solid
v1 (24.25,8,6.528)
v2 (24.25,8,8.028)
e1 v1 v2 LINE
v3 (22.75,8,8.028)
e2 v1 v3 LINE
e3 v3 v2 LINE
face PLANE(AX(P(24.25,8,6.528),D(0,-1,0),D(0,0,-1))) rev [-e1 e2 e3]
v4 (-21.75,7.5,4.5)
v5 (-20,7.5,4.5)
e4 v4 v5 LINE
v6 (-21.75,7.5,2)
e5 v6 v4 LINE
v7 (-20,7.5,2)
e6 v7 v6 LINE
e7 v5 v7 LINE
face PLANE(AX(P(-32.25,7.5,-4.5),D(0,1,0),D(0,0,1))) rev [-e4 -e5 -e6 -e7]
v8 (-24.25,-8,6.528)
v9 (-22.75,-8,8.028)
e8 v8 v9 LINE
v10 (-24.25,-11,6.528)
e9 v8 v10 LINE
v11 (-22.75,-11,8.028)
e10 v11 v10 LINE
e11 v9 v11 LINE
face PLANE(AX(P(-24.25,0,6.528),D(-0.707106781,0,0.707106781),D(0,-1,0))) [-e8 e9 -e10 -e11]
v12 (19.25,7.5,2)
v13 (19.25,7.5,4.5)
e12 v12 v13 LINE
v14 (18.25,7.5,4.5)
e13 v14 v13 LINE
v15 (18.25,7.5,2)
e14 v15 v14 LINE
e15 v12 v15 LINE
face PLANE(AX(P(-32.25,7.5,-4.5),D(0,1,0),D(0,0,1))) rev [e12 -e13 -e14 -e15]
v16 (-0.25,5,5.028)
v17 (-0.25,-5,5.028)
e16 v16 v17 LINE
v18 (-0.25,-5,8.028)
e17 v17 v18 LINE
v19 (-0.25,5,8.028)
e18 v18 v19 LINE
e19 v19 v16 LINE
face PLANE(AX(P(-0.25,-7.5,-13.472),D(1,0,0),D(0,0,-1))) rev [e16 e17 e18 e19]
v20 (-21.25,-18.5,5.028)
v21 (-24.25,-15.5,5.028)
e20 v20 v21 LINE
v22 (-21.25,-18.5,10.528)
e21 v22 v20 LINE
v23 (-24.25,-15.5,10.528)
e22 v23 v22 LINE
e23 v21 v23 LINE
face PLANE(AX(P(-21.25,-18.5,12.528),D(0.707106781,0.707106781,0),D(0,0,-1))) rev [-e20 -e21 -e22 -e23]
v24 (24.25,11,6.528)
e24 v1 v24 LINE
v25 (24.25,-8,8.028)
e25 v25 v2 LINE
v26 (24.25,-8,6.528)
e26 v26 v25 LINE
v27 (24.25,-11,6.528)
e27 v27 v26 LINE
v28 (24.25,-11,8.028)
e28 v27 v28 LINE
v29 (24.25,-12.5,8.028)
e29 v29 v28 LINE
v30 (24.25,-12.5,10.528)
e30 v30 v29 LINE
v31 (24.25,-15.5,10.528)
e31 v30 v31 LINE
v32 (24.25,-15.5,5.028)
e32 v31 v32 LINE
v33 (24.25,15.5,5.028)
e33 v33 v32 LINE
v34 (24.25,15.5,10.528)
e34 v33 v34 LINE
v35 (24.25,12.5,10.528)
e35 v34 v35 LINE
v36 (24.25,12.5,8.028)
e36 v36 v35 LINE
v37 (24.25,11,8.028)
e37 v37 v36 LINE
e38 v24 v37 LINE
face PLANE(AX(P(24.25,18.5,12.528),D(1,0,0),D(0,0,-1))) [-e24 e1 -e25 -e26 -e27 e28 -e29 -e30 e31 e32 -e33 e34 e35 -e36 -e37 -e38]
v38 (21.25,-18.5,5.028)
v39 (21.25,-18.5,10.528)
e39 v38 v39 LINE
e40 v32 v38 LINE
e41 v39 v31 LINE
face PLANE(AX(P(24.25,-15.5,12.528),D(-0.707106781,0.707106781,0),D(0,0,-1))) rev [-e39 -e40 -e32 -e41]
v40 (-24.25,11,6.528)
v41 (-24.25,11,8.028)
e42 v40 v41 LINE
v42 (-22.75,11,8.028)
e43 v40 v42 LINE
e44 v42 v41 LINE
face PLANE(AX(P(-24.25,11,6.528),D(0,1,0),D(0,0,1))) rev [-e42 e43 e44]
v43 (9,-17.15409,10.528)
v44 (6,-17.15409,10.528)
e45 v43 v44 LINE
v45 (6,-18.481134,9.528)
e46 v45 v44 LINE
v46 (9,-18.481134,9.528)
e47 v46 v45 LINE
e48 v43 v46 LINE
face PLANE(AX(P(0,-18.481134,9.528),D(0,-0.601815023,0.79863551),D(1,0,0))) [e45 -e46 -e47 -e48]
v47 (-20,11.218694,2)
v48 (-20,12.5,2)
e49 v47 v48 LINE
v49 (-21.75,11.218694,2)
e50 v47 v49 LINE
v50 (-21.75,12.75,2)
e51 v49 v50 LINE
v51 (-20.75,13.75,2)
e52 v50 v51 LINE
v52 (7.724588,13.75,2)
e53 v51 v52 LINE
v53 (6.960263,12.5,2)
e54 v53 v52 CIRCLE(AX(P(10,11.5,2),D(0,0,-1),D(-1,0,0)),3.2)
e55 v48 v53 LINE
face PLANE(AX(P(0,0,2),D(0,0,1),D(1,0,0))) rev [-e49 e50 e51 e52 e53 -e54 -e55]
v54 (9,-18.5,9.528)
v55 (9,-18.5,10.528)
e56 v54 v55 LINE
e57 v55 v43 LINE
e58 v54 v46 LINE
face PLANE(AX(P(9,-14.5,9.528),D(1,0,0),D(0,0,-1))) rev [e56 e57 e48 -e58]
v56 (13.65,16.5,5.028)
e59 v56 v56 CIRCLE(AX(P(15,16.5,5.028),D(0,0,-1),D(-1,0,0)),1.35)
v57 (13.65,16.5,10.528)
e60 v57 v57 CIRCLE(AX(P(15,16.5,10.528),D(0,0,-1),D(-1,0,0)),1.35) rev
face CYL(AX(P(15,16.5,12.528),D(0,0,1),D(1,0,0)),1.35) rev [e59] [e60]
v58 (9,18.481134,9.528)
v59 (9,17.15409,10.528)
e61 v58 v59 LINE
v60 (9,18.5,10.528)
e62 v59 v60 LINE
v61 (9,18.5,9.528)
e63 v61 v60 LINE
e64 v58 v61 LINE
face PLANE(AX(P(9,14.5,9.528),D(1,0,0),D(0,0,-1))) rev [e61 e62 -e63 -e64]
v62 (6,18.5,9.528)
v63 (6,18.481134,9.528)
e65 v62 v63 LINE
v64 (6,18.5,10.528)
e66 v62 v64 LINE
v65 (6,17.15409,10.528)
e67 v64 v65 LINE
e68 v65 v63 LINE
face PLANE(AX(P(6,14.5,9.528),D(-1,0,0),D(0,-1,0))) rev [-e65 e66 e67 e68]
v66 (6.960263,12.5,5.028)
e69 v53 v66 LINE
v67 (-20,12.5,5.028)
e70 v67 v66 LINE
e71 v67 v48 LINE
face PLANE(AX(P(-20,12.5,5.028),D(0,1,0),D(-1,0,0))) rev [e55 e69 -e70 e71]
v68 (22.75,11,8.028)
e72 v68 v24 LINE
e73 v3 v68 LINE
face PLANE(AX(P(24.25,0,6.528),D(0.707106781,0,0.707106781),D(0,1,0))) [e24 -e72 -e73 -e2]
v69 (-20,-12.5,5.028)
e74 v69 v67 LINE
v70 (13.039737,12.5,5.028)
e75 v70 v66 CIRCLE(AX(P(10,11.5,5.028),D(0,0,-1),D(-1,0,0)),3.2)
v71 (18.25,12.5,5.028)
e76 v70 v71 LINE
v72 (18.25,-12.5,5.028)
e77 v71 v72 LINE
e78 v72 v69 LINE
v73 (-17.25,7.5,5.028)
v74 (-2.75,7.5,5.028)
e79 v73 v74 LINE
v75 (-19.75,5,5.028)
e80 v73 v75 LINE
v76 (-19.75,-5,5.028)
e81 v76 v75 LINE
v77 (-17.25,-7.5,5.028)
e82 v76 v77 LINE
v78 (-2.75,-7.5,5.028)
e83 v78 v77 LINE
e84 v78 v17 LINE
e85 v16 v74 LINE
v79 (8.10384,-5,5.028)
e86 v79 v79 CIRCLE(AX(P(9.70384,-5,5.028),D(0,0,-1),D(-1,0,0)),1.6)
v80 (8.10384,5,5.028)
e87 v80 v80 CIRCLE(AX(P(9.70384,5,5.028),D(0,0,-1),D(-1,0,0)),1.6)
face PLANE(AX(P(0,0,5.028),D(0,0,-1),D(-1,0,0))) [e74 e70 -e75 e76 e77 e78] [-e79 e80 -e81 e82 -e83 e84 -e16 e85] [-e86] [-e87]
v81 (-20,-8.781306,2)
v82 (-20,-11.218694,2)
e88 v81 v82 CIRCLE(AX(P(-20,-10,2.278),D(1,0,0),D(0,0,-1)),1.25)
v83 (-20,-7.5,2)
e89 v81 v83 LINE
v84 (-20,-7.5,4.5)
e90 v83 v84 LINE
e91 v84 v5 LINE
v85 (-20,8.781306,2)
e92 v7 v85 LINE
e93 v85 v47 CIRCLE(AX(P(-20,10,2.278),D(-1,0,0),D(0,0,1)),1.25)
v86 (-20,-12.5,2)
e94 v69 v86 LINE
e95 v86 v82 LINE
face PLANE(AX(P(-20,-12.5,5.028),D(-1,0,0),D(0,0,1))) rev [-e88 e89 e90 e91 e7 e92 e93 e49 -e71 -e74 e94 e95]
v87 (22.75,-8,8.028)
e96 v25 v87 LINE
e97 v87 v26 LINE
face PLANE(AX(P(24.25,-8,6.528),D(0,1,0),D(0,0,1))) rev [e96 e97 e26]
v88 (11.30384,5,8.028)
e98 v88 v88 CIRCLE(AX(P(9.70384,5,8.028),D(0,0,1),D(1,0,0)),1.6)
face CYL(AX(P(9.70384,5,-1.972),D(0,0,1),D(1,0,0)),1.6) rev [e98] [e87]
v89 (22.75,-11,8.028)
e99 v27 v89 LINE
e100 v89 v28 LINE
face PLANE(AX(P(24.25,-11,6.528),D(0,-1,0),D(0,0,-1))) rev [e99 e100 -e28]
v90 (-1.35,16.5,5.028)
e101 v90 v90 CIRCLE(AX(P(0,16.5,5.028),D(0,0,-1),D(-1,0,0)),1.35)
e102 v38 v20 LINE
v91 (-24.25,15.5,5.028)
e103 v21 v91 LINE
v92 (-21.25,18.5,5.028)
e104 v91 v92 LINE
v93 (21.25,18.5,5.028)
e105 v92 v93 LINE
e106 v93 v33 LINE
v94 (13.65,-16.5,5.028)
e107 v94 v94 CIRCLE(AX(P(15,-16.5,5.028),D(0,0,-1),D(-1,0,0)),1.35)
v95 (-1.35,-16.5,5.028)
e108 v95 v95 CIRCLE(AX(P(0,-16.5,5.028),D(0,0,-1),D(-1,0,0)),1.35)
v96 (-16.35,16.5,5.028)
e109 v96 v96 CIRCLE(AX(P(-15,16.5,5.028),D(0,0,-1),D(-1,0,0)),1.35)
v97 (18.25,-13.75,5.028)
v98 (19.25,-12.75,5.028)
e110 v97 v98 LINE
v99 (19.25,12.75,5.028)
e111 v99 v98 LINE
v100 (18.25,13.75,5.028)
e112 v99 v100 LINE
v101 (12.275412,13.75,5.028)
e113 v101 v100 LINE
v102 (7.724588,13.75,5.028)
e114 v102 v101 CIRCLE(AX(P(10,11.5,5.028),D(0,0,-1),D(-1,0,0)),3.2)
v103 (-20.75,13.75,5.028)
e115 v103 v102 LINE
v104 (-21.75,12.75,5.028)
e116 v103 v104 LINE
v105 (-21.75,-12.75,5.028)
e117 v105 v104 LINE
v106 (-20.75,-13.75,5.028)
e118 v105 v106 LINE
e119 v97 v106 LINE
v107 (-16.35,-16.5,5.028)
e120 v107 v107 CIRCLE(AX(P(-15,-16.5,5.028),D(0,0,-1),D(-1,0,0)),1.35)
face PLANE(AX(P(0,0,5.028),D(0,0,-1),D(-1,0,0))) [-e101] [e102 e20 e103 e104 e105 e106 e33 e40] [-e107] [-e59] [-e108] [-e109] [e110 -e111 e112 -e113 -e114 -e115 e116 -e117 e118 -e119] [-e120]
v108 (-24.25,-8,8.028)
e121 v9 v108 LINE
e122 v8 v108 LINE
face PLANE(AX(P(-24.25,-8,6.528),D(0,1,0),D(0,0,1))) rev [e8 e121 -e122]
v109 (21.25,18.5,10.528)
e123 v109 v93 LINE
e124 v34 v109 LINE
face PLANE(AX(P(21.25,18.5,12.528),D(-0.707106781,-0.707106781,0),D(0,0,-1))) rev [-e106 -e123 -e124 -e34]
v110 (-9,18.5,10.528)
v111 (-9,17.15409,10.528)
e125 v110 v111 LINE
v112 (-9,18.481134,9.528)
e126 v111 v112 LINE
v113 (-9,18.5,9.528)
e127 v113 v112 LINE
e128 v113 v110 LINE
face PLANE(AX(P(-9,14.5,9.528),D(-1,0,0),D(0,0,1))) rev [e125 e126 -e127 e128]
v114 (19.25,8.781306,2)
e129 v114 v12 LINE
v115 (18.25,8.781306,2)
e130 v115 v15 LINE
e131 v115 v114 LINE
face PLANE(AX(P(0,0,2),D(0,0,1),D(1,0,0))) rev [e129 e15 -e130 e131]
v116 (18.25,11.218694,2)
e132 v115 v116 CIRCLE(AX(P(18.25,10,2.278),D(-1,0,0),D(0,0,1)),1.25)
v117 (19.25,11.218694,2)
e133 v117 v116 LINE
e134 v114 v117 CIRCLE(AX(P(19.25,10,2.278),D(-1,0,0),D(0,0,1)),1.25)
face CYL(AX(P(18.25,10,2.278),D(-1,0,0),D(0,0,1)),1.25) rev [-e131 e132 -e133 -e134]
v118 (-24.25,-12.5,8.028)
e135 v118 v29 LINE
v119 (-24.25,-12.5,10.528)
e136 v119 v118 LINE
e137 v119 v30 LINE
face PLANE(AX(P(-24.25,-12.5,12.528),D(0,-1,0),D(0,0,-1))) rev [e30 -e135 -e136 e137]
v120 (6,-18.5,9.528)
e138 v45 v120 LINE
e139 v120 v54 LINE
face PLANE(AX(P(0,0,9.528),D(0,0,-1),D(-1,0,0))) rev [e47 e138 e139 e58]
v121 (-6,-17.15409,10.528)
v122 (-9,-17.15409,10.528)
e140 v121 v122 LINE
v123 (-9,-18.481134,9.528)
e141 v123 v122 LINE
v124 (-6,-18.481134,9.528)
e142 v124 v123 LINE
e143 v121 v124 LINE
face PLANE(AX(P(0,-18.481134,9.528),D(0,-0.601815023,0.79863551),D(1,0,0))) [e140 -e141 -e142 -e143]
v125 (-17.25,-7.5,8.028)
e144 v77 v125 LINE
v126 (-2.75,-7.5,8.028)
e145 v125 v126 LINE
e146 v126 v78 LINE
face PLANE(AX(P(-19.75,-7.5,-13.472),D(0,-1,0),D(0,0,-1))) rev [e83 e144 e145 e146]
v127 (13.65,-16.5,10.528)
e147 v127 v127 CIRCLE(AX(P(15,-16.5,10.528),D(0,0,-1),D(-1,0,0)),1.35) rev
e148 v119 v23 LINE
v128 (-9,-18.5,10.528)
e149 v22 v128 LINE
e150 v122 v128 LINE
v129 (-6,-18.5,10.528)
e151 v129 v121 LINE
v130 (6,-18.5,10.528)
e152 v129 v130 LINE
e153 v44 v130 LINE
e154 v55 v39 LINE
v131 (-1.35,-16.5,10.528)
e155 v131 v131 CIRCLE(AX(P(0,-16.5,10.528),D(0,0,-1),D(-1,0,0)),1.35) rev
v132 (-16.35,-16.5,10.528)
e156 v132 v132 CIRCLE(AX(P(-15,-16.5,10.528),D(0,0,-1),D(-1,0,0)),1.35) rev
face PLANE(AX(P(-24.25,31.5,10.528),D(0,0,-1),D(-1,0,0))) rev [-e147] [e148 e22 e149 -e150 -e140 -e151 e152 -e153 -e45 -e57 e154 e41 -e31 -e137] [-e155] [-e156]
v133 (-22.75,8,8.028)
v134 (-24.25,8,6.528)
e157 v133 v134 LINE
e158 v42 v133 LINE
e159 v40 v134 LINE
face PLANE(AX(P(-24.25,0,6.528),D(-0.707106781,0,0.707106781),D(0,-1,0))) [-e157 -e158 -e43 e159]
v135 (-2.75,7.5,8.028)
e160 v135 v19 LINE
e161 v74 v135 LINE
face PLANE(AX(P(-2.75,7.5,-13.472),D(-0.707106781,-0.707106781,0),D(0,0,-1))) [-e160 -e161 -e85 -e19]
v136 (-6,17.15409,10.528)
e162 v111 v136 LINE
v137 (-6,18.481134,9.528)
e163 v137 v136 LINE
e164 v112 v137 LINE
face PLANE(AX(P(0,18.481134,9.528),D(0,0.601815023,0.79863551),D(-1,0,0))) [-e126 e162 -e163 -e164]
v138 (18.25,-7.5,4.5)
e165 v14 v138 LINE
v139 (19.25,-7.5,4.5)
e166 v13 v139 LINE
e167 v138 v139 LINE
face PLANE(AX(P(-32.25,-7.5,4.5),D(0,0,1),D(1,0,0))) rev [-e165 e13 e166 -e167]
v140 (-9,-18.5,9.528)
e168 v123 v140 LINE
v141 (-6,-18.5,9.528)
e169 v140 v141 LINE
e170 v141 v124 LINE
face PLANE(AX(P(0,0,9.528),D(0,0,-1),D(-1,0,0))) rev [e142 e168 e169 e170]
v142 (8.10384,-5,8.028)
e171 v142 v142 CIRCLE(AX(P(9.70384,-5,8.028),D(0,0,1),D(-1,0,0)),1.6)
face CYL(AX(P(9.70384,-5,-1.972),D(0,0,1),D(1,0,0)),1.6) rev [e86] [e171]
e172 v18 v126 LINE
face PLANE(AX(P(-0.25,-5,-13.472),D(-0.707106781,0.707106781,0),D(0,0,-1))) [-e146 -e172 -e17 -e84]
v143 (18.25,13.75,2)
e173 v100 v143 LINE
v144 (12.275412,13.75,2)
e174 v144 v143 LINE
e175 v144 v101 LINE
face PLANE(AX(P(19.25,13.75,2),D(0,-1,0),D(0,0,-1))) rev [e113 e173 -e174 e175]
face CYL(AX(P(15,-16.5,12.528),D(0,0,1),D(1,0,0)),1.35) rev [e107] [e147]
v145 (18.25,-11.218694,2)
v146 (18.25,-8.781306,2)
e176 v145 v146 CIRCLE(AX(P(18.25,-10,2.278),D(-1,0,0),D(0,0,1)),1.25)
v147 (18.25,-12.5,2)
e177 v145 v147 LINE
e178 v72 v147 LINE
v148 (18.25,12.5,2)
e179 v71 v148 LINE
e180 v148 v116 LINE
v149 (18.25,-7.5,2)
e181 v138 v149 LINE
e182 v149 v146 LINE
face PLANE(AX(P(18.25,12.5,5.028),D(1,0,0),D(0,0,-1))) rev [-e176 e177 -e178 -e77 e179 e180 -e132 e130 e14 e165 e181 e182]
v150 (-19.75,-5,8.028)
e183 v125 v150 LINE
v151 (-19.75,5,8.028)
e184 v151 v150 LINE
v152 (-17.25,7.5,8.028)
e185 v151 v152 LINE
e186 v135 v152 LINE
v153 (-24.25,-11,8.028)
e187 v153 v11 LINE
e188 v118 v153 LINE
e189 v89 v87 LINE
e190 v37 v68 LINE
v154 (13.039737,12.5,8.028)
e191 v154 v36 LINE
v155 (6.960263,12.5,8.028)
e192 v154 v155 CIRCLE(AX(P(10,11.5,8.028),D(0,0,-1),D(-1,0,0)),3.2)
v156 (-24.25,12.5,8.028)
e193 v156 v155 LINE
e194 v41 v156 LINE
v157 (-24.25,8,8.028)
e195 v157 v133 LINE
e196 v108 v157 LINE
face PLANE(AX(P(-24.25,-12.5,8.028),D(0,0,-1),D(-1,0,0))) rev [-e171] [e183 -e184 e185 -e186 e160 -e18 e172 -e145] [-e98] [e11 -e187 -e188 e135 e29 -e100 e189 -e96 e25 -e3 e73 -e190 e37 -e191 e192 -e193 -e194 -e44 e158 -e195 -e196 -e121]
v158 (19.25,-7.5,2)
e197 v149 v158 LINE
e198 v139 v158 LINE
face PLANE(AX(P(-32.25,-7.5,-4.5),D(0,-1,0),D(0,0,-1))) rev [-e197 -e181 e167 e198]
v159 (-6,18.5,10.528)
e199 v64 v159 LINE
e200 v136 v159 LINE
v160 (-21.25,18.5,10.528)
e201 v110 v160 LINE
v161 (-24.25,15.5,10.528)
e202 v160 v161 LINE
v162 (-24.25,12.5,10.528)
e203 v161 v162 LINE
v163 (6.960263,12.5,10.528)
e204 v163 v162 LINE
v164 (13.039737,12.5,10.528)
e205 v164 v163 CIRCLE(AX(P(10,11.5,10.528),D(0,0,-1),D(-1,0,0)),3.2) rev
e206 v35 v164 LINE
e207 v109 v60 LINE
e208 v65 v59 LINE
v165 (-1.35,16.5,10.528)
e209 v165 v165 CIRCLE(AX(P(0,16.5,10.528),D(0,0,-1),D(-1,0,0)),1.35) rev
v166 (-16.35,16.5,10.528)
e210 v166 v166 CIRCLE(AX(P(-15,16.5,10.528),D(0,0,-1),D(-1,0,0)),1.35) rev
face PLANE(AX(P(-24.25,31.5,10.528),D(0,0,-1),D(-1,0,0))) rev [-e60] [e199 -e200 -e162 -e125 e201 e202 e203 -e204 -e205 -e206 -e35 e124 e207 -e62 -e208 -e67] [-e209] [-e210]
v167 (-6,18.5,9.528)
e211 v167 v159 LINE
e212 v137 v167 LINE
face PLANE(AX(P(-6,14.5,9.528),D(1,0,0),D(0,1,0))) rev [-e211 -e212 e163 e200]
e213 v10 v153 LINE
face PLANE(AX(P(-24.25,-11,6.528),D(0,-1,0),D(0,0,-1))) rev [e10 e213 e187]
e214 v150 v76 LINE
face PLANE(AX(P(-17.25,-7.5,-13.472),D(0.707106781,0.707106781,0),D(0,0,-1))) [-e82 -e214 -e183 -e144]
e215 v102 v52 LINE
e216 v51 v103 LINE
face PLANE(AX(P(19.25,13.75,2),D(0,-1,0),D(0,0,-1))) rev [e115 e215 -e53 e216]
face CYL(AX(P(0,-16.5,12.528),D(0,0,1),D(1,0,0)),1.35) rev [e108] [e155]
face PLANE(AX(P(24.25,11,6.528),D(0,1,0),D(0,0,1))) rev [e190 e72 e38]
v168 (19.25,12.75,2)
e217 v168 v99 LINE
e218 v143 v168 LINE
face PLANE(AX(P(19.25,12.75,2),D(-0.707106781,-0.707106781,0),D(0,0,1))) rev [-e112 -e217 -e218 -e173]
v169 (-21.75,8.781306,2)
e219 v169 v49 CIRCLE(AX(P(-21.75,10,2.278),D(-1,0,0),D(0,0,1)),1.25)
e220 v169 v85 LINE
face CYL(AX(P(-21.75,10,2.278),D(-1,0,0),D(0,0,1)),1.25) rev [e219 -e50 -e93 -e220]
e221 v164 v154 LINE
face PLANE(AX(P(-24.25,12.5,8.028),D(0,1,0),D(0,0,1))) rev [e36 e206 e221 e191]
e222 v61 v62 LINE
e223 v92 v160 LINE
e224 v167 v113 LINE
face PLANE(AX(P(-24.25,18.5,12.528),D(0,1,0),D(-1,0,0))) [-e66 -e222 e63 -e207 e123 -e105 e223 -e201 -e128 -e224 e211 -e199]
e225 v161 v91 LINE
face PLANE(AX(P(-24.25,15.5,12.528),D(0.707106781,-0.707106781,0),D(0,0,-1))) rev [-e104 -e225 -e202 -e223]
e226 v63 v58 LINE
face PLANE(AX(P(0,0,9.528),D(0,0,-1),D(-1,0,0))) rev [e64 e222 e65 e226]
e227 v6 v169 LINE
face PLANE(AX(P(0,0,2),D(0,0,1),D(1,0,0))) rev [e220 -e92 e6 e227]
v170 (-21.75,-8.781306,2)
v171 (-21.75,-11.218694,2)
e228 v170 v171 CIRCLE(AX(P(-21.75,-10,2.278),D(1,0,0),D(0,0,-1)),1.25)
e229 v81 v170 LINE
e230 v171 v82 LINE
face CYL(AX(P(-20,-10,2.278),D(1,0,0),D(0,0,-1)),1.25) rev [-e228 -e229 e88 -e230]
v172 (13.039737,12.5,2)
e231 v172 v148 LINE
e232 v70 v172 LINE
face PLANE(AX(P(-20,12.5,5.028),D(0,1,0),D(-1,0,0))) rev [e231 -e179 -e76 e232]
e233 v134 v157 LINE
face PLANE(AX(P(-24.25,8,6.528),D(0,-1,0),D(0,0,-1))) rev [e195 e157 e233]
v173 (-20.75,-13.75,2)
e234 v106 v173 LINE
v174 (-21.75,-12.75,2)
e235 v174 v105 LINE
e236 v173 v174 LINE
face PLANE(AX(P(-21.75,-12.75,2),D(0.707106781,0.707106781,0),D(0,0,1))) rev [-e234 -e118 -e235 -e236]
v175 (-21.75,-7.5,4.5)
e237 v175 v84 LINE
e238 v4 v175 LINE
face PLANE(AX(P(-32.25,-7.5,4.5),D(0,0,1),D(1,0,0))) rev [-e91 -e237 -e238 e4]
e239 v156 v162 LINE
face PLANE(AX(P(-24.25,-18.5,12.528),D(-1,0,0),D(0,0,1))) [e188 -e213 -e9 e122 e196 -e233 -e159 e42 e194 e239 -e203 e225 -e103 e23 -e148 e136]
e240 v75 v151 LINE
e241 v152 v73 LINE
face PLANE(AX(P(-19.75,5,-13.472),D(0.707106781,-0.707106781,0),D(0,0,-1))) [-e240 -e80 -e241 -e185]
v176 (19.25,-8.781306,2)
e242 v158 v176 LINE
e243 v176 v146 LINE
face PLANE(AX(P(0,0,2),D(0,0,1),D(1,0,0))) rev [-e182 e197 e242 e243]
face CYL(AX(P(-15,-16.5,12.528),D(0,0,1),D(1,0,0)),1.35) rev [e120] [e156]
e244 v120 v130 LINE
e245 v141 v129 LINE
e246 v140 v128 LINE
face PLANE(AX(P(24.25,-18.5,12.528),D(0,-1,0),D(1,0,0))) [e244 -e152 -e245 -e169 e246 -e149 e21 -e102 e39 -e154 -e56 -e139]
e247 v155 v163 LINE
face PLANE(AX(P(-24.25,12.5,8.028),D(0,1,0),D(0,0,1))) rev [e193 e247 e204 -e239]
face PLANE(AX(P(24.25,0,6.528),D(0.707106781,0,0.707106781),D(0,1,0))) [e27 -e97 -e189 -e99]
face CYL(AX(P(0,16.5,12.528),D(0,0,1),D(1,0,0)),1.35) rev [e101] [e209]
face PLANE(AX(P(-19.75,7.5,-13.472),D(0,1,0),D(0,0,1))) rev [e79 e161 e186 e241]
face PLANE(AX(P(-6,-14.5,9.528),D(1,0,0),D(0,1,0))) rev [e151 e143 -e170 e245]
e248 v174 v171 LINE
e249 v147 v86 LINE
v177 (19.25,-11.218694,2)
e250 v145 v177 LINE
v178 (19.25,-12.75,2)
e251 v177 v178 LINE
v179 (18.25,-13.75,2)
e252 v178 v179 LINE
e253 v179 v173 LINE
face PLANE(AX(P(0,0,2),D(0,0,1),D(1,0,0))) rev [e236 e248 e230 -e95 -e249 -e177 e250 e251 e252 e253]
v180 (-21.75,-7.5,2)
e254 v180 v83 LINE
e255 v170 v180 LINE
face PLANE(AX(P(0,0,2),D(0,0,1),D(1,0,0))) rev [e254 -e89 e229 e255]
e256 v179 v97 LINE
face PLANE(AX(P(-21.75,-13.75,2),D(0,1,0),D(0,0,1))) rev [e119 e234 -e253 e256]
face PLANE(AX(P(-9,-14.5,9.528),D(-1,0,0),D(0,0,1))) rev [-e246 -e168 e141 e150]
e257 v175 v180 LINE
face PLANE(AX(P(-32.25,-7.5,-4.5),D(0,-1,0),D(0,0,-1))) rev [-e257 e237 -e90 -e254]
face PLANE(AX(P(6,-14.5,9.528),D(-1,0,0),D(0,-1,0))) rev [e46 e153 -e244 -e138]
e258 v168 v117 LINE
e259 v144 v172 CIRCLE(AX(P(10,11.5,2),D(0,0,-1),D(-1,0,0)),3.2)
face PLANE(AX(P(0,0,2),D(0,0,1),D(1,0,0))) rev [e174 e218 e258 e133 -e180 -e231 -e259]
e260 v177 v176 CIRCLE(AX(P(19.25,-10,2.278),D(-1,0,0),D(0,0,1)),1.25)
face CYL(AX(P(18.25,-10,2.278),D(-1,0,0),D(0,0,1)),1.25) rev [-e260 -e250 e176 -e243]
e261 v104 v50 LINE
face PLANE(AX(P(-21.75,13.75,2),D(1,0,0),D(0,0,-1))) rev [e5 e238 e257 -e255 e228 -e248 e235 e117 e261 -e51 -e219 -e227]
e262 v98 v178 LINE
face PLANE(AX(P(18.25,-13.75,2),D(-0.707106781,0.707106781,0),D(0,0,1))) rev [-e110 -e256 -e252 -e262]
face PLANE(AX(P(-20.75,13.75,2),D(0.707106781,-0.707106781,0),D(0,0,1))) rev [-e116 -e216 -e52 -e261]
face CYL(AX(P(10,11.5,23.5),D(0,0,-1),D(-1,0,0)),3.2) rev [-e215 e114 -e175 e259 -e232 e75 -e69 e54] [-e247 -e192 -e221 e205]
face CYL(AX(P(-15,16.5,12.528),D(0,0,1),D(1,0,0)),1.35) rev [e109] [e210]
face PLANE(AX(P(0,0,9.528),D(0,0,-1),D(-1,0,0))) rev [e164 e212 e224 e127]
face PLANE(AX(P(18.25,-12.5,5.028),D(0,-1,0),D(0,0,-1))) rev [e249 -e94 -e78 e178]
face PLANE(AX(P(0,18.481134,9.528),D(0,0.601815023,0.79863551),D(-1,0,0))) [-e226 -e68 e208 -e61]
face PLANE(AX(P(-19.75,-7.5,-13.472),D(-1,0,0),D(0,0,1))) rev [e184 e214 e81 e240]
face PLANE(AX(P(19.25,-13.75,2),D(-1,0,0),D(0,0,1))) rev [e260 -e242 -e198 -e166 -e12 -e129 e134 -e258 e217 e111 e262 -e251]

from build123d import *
from OCP.BRepFilletAPI import BRepFilletAPI_MakeChamfer

# Parameters (mm, degrees)
SKETCH_1_W                  = 48.5
SKETCH_1_H                  = 37
EXTRUDE_1_DEPTH             = 7.5
SKETCH_2_W                  = 4.5
SKETCH_2_H                  = 25
CUT_EXTRUDE_1_DEPTH         = 54.398977368
SKETCH_3_W                  = 41
SKETCH_3_H                  = 27.5
EXTRUDE_2_DEPTH             = 3.028
SKETCH_4_W                  = 38.25
SKETCH_4_H                  = 25
CUT_EXTRUDE_2_DEPTH         = 3.028
CUT_EXTRUDE_3_DEPTH         = 49.015109955
CUT_EXTRUDE_4_DEPTH         = 52.139033859
CUT_EXTRUDE_5_DEPTH         = 32.090983966
HOLE_WIZARD_2_5_2_5_1_D     = 2.5
HOLE_WIZARD_2_5_2_5_1_DEPTH = 1.75
HOLE_WIZARD_2_5_2_5_2_D     = 2.5
HOLE_WIZARD_2_5_2_5_2_DEPTH = 6
HOLE_WIZARD_2_5_2_5_3_D     = 2.5
HOLE_WIZARD_2_5_2_5_3_DEPTH = 4.25
HOLE_WIZARD_2_7_2_7_1_D     = 2.7
CHAMFER_1_SIZE              = 3
SKETCH_17_W                 = 3
SKETCH_17_H                 = 4
CUT_EXTRUDE_8_DEPTH         = 3
CHAMFER_2_SIZE              = 3
CHAMFER_2_SIZE_2            = 3.981134465
SKETCH_19_W                 = 2
SKETCH_19_H                 = 3
CUT_EXTRUDE_9_DEPTH         = 1.5
CHAMFER_3_SIZE              = 2
CHAMFER_4_SIZE              = 1
SKETCH_20_R                 = 3.2
CUT_EXTRUDE_10_DEPTH        = 21.5
SKETCH_21_W                 = 19.5
SKETCH_21_H                 = 15
CUT_EXTRUDE_11_DEPTH        = 21.5
CHAMFER_5_SIZE              = 2.5
SKETCH_22_W                 = 9
SKETCH_22_H                 = 15
CUT_EXTRUDE_12_DEPTH        = 51.5
SKETCH_23_W                 = 48.5
SKETCH_23_H                 = 2
CUT_EXTRUDE_13_DEPTH        = 50
SKETCH_24_R                 = 1.6
CUT_EXTRUDE_14_DEPTH        = 10


# Some blends are built 0.0001 mm under size
with BuildPart() as part:
    # 草图1 → 凸台-拉伸1 (new body)
    with BuildSketch(Plane(origin=(0, 0, 5.028), x_dir=(-1, 0, 0), z_dir=(0, 0, -1))):
        Rectangle(SKETCH_1_W, SKETCH_1_H)
    extrude(amount=-EXTRUDE_1_DEPTH)

    # 草图2 → 切除-拉伸1 (cut, through all)
    with BuildSketch(Plane(origin=(24.25, 0, 0), x_dir=(0, 0, -1), z_dir=(1, 0, 0))):
        with Locations((-10.278, 0)):
            Rectangle(SKETCH_2_W, SKETCH_2_H)
    extrude(amount=-CUT_EXTRUDE_1_DEPTH, mode=Mode.SUBTRACT)

    # 草图3 → 凸台-拉伸2 (add)
    with BuildSketch(Plane(origin=(0, 0, 5.028), x_dir=(-1, 0, 0), z_dir=(0, 0, -1))):
        with Locations((1.25, 0)):
            Rectangle(SKETCH_3_W, SKETCH_3_H)
    extrude(amount=EXTRUDE_2_DEPTH)

    # 草图4 → 切除-拉伸2 (cut)
    with BuildSketch(Plane(origin=(0, 0, 2), x_dir=(-1, 0, 0), z_dir=(0, 0, -1))):
        with Locations((0.875, 0)):
            Rectangle(SKETCH_4_W, SKETCH_4_H)
    extrude(amount=-CUT_EXTRUDE_2_DEPTH, mode=Mode.SUBTRACT)

    # 草图5 → 切除-拉伸3 (cut, through all)
    with BuildSketch(Plane.ZY.offset(-18.25)):
        with BuildLine():
            Line((2, 7.034395212), (2, -7.034395212))
            ThreePointArc((2, -7.034395212), (4.278, 0), (2, 7.034395212))
        make_face()
    extrude(amount=-CUT_EXTRUDE_3_DEPTH, mode=Mode.SUBTRACT)

    # 草图6 → 切除-拉伸4 (cut, through all)
    with BuildSketch(Plane.ZY.offset(21.75)):
        with BuildLine():
            Line((2, 7.034395212), (2, -7.034395212))
            ThreePointArc((2, -7.034395212), (4.278, 0), (2, 7.034395212))
        make_face()
    extrude(amount=-CUT_EXTRUDE_4_DEPTH, mode=Mode.SUBTRACT)

    # 草图7 → 切除-拉伸5 (cut, through all)
    with BuildSketch(Plane.XY.offset(8.028)):
        with BuildLine():
            Line((-7.978419869, 7.029222073), (-13.021580131, 7.029222073))
            ThreePointArc((-13.021580131, 7.029222073), (-17.801221513, 4.934335949), (-19.5, 0))
            ThreePointArc((-19.5, 0), (-17.801221513, -4.934335949), (-13.021580131, -7.029222073))
            Line((-13.021580131, -7.029222073), (-7.978419869, -7.029222073))
            ThreePointArc((-7.978419869, -7.029222073), (-3.198778487, -4.934335949), (-1.5, 0))
            ThreePointArc((-1.5, 0), (-3.198778487, 4.934335949), (-7.978419869, 7.029222073))
        make_face()
    extrude(amount=-CUT_EXTRUDE_5_DEPTH, mode=Mode.SUBTRACT)

    # Ø2.5 (2.5) 直径孔1
    with Locations(Plane.ZY.offset(21.75)):
        with Locations((2.278, 10)):
            Hole(HOLE_WIZARD_2_5_2_5_1_D / 2, depth=HOLE_WIZARD_2_5_2_5_1_DEPTH)

    # Ø2.5 (2.5) 直径孔2
    with Locations(Plane.ZY.offset(-18.25)):
        with Locations((2.278, -10), (2.278, 10)):
            Hole(HOLE_WIZARD_2_5_2_5_2_D / 2, depth=HOLE_WIZARD_2_5_2_5_2_DEPTH)

    # Ø2.5 (2.5) 直径孔3
    with Locations(Plane(origin=(-20, 0, 0), x_dir=(0, 0, -1), z_dir=(1, 0, 0))):
        with Locations((-2.278, -10)):
            Hole(HOLE_WIZARD_2_5_2_5_3_D / 2, depth=HOLE_WIZARD_2_5_2_5_3_DEPTH)

    # Ø2.7 (2.7) 直径孔1 (through all)
    with Locations(Plane.XY.offset(12.528)):
        with Locations((0, -16.5), (-15, -16.5), (15, -16.5), (0, 16.5), (-15, 16.5), (15, 16.5)):
            Hole(HOLE_WIZARD_2_7_2_7_1_D / 2)

    # 倒角1
    chamfer_1_edges = [part.edges().sort_by_distance(p)[0] for p in [
        (-24.25, 18.5, 8.778),
        (-24.25, -18.5, 8.778),
        (24.25, -18.5, 8.778),
        (24.25, 18.5, 8.778),
    ]]
    chamfer(chamfer_1_edges, length=CHAMFER_1_SIZE)

    # 草图17 → 切除-拉伸8 (cut)
    with BuildSketch(Plane.XY.offset(12.528)):
        with Locations((-7.5, -16.5)):
            Rectangle(SKETCH_17_W, SKETCH_17_H)
        with Locations((7.5, -16.5)):
            Rectangle(SKETCH_17_W, SKETCH_17_H)
        with Locations((7.5, 16.5)):
            Rectangle(SKETCH_17_W, SKETCH_17_H)
        with Locations((-7.5, 16.5)):
            Rectangle(SKETCH_17_W, SKETCH_17_H)
    extrude(amount=-CUT_EXTRUDE_8_DEPTH, mode=Mode.SUBTRACT)

    # 倒角2
    chamfer_2_edges_1 = [part.edges().sort_by_distance(p)[0] for p in [
        (7.5, -14.5, 9.528),
    ]]
    chamfer_2_side_1 = [part.faces().sort_by_distance(p)[0] for p in [
        (7.5, -14.5, 9.588),
    ]]
    chamfer_2_edges_2 = [part.edges().sort_by_distance(p)[0] for p in [
        (-7.5, -14.5, 9.528),
    ]]
    chamfer_2_side_2 = [part.faces().sort_by_distance(p)[0] for p in [
        (-7.5, -14.5, 9.588),
    ]]
    chamfer_2_edges_3 = [part.edges().sort_by_distance(p)[0] for p in [
        (-7.5, 14.5, 9.528),
    ]]
    chamfer_2_side_3 = [part.faces().sort_by_distance(p)[0] for p in [
        (-7.5, 14.5, 9.588),
    ]]
    chamfer_2_edges_4 = [part.edges().sort_by_distance(p)[0] for p in [
        (7.5, 14.5, 9.528),
    ]]
    chamfer_2_side_4 = [part.faces().sort_by_distance(p)[0] for p in [
        (7.5, 14.5, 9.588),
    ]]
    chamfer_2 = BRepFilletAPI_MakeChamfer(part.part.solid().wrapped)
    for e in chamfer_2_edges_1:
        chamfer_2.Add(CHAMFER_2_SIZE - 0.0001, CHAMFER_2_SIZE_2 - 0.0001, e.wrapped, chamfer_2_side_1[0].wrapped)
    for e in chamfer_2_edges_2:
        chamfer_2.Add(CHAMFER_2_SIZE - 0.0001, CHAMFER_2_SIZE_2 - 0.0001, e.wrapped, chamfer_2_side_2[0].wrapped)
    for e in chamfer_2_edges_3:
        chamfer_2.Add(CHAMFER_2_SIZE - 0.0001, CHAMFER_2_SIZE_2 - 0.0001, e.wrapped, chamfer_2_side_3[0].wrapped)
    for e in chamfer_2_edges_4:
        chamfer_2.Add(CHAMFER_2_SIZE - 0.0001, CHAMFER_2_SIZE_2 - 0.0001, e.wrapped, chamfer_2_side_4[0].wrapped)
    add(Compound.cast(chamfer_2.Shape()), mode=Mode.REPLACE)  # a hair under: the kernel refuses the full size

    # 草图19 → 切除-拉伸9 (cut)
    with BuildSketch(Plane.XY.offset(8.028)):
        with Locations((-23.25, -9.5)):
            Rectangle(SKETCH_19_W, SKETCH_19_H)
        with Locations((-23.25, 9.5)):
            Rectangle(SKETCH_19_W, SKETCH_19_H)
        with Locations((23.25, 9.5)):
            Rectangle(SKETCH_19_W, SKETCH_19_H)
        with Locations((23.25, -9.5)):
            Rectangle(SKETCH_19_W, SKETCH_19_H)
    extrude(amount=-CUT_EXTRUDE_9_DEPTH, mode=Mode.SUBTRACT)

    # 倒角3
    # the kernel refuses this chamfer: 2 mm, written as the material it adds along each edge
    with BuildSketch(Plane(origin=(22.25, 11, 6.528), x_dir=(0.9996219169112968, 0, -0.02749587661058651), z_dir=(0, -1, 0))) as chamfer_3_piece_1_section:
        Polygon((CHAMFER_3_SIZE * 0.999621916911, CHAMFER_3_SIZE * 0.0274958766106), (-CHAMFER_3_SIZE * 0.0274958766106, CHAMFER_3_SIZE * 0.999621916911), (0, 0), align=None)
    chamfer_3_piece_1 = extrude(amount=8.143365976, mode=Mode.PRIVATE)
    chamfer_3_piece_1 = split(chamfer_3_piece_1, bisect_by=Plane(origin=(22.95, 9.5, 8.028), z_dir=(0, 0, -1)), keep=Keep.TOP, mode=Mode.PRIVATE)
    add(chamfer_3_piece_1)
    with BuildSketch(Plane(origin=(22.25, -11, 6.528), x_dir=(0.9996219169112968, 0, -0.02749587661058651), z_dir=(0, 1, 0))) as chamfer_3_piece_2_section:
        Polygon((CHAMFER_3_SIZE * 0.999621916911, -CHAMFER_3_SIZE * 0.0274958766106), (-CHAMFER_3_SIZE * 0.0274958766106, -CHAMFER_3_SIZE * 0.999621916911), (0, 0), align=None)
    chamfer_3_piece_2 = extrude(amount=8.143365976, mode=Mode.PRIVATE)
    chamfer_3_piece_2 = split(chamfer_3_piece_2, bisect_by=Plane(origin=(22.95, -9.5, 8.028), z_dir=(0, 0, -1)), keep=Keep.TOP, mode=Mode.PRIVATE)
    add(chamfer_3_piece_2)
    with BuildSketch(Plane(origin=(-22.25, 11, 6.528), x_dir=(-0.9996219169112968, 0, -0.02749587661058651), z_dir=(0, -1, 0))) as chamfer_3_piece_3_section:
        Polygon((CHAMFER_3_SIZE * 0.999621916911, -CHAMFER_3_SIZE * 0.0274958766106), (-CHAMFER_3_SIZE * 0.0274958766106, -CHAMFER_3_SIZE * 0.999621916911), (0, 0), align=None)
    chamfer_3_piece_3 = extrude(amount=8.143365976, mode=Mode.PRIVATE)
    chamfer_3_piece_3 = split(chamfer_3_piece_3, bisect_by=Plane(origin=(-22.95, 9.5, 8.028), z_dir=(0, 0, -1)), keep=Keep.TOP, mode=Mode.PRIVATE)
    add(chamfer_3_piece_3)
    with BuildSketch(Plane(origin=(-22.25, -16.143365976, 6.528), x_dir=(-0.9996219169112968, 0, -0.02749587661058651), z_dir=(0, 1, 0))) as chamfer_3_piece_4_section:
        Polygon((CHAMFER_3_SIZE * 0.999621916911, CHAMFER_3_SIZE * 0.0274958766106), (-CHAMFER_3_SIZE * 0.0274958766106, CHAMFER_3_SIZE * 0.999621916911), (0, 0), align=None)
    chamfer_3_piece_4 = extrude(amount=13.286731952, mode=Mode.PRIVATE)
    chamfer_3_piece_4 = split(chamfer_3_piece_4, bisect_by=Plane(origin=(-22.95, -9.5, 8.028), z_dir=(0, 0, -1)), keep=Keep.TOP, mode=Mode.PRIVATE)
    chamfer_3_piece_4 = split(chamfer_3_piece_4, bisect_by=Plane(origin=(-26.6, -13.15, 7.128), z_dir=(0.7071067811865476, 0.7071067811865476, 0)), keep=Keep.TOP, mode=Mode.PRIVATE)
    add(chamfer_3_piece_4)

    # 倒角4
    chamfer_4_edges = [part.edges().sort_by_distance(p)[0] for p in [
        (-21.75, 13.75, 3.514),
        (19.25, 13.75, 3.514),
        (19.25, -13.75, 3.514),
        (-21.75, -13.75, 3.514),
    ]]
    chamfer(chamfer_4_edges, length=CHAMFER_4_SIZE)

    # 草图20 → 切除-拉伸10 (cut)
    with BuildSketch(Plane(origin=(0, 0, 2), x_dir=(-1, 0, 0), z_dir=(0, 0, -1))):
        with Locations(Location((-10, 11.5, 0), (0, 0, 18.209956864))):
            Circle(SKETCH_20_R)
    extrude(amount=-CUT_EXTRUDE_10_DEPTH, mode=Mode.SUBTRACT)

    # 草图21 → 切除-拉伸11 (cut)
    with BuildSketch(Plane.XY.offset(8.028)):
        with Locations((-10, 0)):
            Rectangle(SKETCH_21_W, SKETCH_21_H)
    extrude(amount=-CUT_EXTRUDE_11_DEPTH, mode=Mode.SUBTRACT)

    # 倒角5
    chamfer_5_edges = [part.edges().sort_by_distance(p)[0] for p in [
        (-0.25, 7.5, 6.528),
        (-0.25, -7.5, 6.528),
        (-19.75, -7.5, 6.528),
        (-19.75, 7.5, 6.528),
    ]]
    chamfer(chamfer_5_edges, length=CHAMFER_5_SIZE)

    # 草图22 → 切除-拉伸12 (cut)
    with BuildSketch(Plane(origin=(19.25, 0, 0), x_dir=(0, 0, -1), z_dir=(1, 0, 0))):
        Rectangle(SKETCH_22_W, SKETCH_22_H)
    extrude(amount=-CUT_EXTRUDE_12_DEPTH, mode=Mode.SUBTRACT)

    # 草图23 → 切除-拉伸13 (cut)
    with BuildSketch(Plane.XZ.offset(18.5)):
        with Locations((0, 11.528)):
            Rectangle(SKETCH_23_W, SKETCH_23_H)
    extrude(amount=-CUT_EXTRUDE_13_DEPTH, mode=Mode.SUBTRACT)

    # 草图24 → 切除-拉伸14 (cut)
    with BuildSketch(Plane.XY.offset(8.028)):
        with Locations((9.703840341, 5)):
            Circle(SKETCH_24_R)
        with Locations(Location((9.703840341, -5, 0), (0, 0, 180))):
            Circle(SKETCH_24_R)
    extrude(amount=-CUT_EXTRUDE_14_DEPTH, mode=Mode.SUBTRACT)


solid = part.part
